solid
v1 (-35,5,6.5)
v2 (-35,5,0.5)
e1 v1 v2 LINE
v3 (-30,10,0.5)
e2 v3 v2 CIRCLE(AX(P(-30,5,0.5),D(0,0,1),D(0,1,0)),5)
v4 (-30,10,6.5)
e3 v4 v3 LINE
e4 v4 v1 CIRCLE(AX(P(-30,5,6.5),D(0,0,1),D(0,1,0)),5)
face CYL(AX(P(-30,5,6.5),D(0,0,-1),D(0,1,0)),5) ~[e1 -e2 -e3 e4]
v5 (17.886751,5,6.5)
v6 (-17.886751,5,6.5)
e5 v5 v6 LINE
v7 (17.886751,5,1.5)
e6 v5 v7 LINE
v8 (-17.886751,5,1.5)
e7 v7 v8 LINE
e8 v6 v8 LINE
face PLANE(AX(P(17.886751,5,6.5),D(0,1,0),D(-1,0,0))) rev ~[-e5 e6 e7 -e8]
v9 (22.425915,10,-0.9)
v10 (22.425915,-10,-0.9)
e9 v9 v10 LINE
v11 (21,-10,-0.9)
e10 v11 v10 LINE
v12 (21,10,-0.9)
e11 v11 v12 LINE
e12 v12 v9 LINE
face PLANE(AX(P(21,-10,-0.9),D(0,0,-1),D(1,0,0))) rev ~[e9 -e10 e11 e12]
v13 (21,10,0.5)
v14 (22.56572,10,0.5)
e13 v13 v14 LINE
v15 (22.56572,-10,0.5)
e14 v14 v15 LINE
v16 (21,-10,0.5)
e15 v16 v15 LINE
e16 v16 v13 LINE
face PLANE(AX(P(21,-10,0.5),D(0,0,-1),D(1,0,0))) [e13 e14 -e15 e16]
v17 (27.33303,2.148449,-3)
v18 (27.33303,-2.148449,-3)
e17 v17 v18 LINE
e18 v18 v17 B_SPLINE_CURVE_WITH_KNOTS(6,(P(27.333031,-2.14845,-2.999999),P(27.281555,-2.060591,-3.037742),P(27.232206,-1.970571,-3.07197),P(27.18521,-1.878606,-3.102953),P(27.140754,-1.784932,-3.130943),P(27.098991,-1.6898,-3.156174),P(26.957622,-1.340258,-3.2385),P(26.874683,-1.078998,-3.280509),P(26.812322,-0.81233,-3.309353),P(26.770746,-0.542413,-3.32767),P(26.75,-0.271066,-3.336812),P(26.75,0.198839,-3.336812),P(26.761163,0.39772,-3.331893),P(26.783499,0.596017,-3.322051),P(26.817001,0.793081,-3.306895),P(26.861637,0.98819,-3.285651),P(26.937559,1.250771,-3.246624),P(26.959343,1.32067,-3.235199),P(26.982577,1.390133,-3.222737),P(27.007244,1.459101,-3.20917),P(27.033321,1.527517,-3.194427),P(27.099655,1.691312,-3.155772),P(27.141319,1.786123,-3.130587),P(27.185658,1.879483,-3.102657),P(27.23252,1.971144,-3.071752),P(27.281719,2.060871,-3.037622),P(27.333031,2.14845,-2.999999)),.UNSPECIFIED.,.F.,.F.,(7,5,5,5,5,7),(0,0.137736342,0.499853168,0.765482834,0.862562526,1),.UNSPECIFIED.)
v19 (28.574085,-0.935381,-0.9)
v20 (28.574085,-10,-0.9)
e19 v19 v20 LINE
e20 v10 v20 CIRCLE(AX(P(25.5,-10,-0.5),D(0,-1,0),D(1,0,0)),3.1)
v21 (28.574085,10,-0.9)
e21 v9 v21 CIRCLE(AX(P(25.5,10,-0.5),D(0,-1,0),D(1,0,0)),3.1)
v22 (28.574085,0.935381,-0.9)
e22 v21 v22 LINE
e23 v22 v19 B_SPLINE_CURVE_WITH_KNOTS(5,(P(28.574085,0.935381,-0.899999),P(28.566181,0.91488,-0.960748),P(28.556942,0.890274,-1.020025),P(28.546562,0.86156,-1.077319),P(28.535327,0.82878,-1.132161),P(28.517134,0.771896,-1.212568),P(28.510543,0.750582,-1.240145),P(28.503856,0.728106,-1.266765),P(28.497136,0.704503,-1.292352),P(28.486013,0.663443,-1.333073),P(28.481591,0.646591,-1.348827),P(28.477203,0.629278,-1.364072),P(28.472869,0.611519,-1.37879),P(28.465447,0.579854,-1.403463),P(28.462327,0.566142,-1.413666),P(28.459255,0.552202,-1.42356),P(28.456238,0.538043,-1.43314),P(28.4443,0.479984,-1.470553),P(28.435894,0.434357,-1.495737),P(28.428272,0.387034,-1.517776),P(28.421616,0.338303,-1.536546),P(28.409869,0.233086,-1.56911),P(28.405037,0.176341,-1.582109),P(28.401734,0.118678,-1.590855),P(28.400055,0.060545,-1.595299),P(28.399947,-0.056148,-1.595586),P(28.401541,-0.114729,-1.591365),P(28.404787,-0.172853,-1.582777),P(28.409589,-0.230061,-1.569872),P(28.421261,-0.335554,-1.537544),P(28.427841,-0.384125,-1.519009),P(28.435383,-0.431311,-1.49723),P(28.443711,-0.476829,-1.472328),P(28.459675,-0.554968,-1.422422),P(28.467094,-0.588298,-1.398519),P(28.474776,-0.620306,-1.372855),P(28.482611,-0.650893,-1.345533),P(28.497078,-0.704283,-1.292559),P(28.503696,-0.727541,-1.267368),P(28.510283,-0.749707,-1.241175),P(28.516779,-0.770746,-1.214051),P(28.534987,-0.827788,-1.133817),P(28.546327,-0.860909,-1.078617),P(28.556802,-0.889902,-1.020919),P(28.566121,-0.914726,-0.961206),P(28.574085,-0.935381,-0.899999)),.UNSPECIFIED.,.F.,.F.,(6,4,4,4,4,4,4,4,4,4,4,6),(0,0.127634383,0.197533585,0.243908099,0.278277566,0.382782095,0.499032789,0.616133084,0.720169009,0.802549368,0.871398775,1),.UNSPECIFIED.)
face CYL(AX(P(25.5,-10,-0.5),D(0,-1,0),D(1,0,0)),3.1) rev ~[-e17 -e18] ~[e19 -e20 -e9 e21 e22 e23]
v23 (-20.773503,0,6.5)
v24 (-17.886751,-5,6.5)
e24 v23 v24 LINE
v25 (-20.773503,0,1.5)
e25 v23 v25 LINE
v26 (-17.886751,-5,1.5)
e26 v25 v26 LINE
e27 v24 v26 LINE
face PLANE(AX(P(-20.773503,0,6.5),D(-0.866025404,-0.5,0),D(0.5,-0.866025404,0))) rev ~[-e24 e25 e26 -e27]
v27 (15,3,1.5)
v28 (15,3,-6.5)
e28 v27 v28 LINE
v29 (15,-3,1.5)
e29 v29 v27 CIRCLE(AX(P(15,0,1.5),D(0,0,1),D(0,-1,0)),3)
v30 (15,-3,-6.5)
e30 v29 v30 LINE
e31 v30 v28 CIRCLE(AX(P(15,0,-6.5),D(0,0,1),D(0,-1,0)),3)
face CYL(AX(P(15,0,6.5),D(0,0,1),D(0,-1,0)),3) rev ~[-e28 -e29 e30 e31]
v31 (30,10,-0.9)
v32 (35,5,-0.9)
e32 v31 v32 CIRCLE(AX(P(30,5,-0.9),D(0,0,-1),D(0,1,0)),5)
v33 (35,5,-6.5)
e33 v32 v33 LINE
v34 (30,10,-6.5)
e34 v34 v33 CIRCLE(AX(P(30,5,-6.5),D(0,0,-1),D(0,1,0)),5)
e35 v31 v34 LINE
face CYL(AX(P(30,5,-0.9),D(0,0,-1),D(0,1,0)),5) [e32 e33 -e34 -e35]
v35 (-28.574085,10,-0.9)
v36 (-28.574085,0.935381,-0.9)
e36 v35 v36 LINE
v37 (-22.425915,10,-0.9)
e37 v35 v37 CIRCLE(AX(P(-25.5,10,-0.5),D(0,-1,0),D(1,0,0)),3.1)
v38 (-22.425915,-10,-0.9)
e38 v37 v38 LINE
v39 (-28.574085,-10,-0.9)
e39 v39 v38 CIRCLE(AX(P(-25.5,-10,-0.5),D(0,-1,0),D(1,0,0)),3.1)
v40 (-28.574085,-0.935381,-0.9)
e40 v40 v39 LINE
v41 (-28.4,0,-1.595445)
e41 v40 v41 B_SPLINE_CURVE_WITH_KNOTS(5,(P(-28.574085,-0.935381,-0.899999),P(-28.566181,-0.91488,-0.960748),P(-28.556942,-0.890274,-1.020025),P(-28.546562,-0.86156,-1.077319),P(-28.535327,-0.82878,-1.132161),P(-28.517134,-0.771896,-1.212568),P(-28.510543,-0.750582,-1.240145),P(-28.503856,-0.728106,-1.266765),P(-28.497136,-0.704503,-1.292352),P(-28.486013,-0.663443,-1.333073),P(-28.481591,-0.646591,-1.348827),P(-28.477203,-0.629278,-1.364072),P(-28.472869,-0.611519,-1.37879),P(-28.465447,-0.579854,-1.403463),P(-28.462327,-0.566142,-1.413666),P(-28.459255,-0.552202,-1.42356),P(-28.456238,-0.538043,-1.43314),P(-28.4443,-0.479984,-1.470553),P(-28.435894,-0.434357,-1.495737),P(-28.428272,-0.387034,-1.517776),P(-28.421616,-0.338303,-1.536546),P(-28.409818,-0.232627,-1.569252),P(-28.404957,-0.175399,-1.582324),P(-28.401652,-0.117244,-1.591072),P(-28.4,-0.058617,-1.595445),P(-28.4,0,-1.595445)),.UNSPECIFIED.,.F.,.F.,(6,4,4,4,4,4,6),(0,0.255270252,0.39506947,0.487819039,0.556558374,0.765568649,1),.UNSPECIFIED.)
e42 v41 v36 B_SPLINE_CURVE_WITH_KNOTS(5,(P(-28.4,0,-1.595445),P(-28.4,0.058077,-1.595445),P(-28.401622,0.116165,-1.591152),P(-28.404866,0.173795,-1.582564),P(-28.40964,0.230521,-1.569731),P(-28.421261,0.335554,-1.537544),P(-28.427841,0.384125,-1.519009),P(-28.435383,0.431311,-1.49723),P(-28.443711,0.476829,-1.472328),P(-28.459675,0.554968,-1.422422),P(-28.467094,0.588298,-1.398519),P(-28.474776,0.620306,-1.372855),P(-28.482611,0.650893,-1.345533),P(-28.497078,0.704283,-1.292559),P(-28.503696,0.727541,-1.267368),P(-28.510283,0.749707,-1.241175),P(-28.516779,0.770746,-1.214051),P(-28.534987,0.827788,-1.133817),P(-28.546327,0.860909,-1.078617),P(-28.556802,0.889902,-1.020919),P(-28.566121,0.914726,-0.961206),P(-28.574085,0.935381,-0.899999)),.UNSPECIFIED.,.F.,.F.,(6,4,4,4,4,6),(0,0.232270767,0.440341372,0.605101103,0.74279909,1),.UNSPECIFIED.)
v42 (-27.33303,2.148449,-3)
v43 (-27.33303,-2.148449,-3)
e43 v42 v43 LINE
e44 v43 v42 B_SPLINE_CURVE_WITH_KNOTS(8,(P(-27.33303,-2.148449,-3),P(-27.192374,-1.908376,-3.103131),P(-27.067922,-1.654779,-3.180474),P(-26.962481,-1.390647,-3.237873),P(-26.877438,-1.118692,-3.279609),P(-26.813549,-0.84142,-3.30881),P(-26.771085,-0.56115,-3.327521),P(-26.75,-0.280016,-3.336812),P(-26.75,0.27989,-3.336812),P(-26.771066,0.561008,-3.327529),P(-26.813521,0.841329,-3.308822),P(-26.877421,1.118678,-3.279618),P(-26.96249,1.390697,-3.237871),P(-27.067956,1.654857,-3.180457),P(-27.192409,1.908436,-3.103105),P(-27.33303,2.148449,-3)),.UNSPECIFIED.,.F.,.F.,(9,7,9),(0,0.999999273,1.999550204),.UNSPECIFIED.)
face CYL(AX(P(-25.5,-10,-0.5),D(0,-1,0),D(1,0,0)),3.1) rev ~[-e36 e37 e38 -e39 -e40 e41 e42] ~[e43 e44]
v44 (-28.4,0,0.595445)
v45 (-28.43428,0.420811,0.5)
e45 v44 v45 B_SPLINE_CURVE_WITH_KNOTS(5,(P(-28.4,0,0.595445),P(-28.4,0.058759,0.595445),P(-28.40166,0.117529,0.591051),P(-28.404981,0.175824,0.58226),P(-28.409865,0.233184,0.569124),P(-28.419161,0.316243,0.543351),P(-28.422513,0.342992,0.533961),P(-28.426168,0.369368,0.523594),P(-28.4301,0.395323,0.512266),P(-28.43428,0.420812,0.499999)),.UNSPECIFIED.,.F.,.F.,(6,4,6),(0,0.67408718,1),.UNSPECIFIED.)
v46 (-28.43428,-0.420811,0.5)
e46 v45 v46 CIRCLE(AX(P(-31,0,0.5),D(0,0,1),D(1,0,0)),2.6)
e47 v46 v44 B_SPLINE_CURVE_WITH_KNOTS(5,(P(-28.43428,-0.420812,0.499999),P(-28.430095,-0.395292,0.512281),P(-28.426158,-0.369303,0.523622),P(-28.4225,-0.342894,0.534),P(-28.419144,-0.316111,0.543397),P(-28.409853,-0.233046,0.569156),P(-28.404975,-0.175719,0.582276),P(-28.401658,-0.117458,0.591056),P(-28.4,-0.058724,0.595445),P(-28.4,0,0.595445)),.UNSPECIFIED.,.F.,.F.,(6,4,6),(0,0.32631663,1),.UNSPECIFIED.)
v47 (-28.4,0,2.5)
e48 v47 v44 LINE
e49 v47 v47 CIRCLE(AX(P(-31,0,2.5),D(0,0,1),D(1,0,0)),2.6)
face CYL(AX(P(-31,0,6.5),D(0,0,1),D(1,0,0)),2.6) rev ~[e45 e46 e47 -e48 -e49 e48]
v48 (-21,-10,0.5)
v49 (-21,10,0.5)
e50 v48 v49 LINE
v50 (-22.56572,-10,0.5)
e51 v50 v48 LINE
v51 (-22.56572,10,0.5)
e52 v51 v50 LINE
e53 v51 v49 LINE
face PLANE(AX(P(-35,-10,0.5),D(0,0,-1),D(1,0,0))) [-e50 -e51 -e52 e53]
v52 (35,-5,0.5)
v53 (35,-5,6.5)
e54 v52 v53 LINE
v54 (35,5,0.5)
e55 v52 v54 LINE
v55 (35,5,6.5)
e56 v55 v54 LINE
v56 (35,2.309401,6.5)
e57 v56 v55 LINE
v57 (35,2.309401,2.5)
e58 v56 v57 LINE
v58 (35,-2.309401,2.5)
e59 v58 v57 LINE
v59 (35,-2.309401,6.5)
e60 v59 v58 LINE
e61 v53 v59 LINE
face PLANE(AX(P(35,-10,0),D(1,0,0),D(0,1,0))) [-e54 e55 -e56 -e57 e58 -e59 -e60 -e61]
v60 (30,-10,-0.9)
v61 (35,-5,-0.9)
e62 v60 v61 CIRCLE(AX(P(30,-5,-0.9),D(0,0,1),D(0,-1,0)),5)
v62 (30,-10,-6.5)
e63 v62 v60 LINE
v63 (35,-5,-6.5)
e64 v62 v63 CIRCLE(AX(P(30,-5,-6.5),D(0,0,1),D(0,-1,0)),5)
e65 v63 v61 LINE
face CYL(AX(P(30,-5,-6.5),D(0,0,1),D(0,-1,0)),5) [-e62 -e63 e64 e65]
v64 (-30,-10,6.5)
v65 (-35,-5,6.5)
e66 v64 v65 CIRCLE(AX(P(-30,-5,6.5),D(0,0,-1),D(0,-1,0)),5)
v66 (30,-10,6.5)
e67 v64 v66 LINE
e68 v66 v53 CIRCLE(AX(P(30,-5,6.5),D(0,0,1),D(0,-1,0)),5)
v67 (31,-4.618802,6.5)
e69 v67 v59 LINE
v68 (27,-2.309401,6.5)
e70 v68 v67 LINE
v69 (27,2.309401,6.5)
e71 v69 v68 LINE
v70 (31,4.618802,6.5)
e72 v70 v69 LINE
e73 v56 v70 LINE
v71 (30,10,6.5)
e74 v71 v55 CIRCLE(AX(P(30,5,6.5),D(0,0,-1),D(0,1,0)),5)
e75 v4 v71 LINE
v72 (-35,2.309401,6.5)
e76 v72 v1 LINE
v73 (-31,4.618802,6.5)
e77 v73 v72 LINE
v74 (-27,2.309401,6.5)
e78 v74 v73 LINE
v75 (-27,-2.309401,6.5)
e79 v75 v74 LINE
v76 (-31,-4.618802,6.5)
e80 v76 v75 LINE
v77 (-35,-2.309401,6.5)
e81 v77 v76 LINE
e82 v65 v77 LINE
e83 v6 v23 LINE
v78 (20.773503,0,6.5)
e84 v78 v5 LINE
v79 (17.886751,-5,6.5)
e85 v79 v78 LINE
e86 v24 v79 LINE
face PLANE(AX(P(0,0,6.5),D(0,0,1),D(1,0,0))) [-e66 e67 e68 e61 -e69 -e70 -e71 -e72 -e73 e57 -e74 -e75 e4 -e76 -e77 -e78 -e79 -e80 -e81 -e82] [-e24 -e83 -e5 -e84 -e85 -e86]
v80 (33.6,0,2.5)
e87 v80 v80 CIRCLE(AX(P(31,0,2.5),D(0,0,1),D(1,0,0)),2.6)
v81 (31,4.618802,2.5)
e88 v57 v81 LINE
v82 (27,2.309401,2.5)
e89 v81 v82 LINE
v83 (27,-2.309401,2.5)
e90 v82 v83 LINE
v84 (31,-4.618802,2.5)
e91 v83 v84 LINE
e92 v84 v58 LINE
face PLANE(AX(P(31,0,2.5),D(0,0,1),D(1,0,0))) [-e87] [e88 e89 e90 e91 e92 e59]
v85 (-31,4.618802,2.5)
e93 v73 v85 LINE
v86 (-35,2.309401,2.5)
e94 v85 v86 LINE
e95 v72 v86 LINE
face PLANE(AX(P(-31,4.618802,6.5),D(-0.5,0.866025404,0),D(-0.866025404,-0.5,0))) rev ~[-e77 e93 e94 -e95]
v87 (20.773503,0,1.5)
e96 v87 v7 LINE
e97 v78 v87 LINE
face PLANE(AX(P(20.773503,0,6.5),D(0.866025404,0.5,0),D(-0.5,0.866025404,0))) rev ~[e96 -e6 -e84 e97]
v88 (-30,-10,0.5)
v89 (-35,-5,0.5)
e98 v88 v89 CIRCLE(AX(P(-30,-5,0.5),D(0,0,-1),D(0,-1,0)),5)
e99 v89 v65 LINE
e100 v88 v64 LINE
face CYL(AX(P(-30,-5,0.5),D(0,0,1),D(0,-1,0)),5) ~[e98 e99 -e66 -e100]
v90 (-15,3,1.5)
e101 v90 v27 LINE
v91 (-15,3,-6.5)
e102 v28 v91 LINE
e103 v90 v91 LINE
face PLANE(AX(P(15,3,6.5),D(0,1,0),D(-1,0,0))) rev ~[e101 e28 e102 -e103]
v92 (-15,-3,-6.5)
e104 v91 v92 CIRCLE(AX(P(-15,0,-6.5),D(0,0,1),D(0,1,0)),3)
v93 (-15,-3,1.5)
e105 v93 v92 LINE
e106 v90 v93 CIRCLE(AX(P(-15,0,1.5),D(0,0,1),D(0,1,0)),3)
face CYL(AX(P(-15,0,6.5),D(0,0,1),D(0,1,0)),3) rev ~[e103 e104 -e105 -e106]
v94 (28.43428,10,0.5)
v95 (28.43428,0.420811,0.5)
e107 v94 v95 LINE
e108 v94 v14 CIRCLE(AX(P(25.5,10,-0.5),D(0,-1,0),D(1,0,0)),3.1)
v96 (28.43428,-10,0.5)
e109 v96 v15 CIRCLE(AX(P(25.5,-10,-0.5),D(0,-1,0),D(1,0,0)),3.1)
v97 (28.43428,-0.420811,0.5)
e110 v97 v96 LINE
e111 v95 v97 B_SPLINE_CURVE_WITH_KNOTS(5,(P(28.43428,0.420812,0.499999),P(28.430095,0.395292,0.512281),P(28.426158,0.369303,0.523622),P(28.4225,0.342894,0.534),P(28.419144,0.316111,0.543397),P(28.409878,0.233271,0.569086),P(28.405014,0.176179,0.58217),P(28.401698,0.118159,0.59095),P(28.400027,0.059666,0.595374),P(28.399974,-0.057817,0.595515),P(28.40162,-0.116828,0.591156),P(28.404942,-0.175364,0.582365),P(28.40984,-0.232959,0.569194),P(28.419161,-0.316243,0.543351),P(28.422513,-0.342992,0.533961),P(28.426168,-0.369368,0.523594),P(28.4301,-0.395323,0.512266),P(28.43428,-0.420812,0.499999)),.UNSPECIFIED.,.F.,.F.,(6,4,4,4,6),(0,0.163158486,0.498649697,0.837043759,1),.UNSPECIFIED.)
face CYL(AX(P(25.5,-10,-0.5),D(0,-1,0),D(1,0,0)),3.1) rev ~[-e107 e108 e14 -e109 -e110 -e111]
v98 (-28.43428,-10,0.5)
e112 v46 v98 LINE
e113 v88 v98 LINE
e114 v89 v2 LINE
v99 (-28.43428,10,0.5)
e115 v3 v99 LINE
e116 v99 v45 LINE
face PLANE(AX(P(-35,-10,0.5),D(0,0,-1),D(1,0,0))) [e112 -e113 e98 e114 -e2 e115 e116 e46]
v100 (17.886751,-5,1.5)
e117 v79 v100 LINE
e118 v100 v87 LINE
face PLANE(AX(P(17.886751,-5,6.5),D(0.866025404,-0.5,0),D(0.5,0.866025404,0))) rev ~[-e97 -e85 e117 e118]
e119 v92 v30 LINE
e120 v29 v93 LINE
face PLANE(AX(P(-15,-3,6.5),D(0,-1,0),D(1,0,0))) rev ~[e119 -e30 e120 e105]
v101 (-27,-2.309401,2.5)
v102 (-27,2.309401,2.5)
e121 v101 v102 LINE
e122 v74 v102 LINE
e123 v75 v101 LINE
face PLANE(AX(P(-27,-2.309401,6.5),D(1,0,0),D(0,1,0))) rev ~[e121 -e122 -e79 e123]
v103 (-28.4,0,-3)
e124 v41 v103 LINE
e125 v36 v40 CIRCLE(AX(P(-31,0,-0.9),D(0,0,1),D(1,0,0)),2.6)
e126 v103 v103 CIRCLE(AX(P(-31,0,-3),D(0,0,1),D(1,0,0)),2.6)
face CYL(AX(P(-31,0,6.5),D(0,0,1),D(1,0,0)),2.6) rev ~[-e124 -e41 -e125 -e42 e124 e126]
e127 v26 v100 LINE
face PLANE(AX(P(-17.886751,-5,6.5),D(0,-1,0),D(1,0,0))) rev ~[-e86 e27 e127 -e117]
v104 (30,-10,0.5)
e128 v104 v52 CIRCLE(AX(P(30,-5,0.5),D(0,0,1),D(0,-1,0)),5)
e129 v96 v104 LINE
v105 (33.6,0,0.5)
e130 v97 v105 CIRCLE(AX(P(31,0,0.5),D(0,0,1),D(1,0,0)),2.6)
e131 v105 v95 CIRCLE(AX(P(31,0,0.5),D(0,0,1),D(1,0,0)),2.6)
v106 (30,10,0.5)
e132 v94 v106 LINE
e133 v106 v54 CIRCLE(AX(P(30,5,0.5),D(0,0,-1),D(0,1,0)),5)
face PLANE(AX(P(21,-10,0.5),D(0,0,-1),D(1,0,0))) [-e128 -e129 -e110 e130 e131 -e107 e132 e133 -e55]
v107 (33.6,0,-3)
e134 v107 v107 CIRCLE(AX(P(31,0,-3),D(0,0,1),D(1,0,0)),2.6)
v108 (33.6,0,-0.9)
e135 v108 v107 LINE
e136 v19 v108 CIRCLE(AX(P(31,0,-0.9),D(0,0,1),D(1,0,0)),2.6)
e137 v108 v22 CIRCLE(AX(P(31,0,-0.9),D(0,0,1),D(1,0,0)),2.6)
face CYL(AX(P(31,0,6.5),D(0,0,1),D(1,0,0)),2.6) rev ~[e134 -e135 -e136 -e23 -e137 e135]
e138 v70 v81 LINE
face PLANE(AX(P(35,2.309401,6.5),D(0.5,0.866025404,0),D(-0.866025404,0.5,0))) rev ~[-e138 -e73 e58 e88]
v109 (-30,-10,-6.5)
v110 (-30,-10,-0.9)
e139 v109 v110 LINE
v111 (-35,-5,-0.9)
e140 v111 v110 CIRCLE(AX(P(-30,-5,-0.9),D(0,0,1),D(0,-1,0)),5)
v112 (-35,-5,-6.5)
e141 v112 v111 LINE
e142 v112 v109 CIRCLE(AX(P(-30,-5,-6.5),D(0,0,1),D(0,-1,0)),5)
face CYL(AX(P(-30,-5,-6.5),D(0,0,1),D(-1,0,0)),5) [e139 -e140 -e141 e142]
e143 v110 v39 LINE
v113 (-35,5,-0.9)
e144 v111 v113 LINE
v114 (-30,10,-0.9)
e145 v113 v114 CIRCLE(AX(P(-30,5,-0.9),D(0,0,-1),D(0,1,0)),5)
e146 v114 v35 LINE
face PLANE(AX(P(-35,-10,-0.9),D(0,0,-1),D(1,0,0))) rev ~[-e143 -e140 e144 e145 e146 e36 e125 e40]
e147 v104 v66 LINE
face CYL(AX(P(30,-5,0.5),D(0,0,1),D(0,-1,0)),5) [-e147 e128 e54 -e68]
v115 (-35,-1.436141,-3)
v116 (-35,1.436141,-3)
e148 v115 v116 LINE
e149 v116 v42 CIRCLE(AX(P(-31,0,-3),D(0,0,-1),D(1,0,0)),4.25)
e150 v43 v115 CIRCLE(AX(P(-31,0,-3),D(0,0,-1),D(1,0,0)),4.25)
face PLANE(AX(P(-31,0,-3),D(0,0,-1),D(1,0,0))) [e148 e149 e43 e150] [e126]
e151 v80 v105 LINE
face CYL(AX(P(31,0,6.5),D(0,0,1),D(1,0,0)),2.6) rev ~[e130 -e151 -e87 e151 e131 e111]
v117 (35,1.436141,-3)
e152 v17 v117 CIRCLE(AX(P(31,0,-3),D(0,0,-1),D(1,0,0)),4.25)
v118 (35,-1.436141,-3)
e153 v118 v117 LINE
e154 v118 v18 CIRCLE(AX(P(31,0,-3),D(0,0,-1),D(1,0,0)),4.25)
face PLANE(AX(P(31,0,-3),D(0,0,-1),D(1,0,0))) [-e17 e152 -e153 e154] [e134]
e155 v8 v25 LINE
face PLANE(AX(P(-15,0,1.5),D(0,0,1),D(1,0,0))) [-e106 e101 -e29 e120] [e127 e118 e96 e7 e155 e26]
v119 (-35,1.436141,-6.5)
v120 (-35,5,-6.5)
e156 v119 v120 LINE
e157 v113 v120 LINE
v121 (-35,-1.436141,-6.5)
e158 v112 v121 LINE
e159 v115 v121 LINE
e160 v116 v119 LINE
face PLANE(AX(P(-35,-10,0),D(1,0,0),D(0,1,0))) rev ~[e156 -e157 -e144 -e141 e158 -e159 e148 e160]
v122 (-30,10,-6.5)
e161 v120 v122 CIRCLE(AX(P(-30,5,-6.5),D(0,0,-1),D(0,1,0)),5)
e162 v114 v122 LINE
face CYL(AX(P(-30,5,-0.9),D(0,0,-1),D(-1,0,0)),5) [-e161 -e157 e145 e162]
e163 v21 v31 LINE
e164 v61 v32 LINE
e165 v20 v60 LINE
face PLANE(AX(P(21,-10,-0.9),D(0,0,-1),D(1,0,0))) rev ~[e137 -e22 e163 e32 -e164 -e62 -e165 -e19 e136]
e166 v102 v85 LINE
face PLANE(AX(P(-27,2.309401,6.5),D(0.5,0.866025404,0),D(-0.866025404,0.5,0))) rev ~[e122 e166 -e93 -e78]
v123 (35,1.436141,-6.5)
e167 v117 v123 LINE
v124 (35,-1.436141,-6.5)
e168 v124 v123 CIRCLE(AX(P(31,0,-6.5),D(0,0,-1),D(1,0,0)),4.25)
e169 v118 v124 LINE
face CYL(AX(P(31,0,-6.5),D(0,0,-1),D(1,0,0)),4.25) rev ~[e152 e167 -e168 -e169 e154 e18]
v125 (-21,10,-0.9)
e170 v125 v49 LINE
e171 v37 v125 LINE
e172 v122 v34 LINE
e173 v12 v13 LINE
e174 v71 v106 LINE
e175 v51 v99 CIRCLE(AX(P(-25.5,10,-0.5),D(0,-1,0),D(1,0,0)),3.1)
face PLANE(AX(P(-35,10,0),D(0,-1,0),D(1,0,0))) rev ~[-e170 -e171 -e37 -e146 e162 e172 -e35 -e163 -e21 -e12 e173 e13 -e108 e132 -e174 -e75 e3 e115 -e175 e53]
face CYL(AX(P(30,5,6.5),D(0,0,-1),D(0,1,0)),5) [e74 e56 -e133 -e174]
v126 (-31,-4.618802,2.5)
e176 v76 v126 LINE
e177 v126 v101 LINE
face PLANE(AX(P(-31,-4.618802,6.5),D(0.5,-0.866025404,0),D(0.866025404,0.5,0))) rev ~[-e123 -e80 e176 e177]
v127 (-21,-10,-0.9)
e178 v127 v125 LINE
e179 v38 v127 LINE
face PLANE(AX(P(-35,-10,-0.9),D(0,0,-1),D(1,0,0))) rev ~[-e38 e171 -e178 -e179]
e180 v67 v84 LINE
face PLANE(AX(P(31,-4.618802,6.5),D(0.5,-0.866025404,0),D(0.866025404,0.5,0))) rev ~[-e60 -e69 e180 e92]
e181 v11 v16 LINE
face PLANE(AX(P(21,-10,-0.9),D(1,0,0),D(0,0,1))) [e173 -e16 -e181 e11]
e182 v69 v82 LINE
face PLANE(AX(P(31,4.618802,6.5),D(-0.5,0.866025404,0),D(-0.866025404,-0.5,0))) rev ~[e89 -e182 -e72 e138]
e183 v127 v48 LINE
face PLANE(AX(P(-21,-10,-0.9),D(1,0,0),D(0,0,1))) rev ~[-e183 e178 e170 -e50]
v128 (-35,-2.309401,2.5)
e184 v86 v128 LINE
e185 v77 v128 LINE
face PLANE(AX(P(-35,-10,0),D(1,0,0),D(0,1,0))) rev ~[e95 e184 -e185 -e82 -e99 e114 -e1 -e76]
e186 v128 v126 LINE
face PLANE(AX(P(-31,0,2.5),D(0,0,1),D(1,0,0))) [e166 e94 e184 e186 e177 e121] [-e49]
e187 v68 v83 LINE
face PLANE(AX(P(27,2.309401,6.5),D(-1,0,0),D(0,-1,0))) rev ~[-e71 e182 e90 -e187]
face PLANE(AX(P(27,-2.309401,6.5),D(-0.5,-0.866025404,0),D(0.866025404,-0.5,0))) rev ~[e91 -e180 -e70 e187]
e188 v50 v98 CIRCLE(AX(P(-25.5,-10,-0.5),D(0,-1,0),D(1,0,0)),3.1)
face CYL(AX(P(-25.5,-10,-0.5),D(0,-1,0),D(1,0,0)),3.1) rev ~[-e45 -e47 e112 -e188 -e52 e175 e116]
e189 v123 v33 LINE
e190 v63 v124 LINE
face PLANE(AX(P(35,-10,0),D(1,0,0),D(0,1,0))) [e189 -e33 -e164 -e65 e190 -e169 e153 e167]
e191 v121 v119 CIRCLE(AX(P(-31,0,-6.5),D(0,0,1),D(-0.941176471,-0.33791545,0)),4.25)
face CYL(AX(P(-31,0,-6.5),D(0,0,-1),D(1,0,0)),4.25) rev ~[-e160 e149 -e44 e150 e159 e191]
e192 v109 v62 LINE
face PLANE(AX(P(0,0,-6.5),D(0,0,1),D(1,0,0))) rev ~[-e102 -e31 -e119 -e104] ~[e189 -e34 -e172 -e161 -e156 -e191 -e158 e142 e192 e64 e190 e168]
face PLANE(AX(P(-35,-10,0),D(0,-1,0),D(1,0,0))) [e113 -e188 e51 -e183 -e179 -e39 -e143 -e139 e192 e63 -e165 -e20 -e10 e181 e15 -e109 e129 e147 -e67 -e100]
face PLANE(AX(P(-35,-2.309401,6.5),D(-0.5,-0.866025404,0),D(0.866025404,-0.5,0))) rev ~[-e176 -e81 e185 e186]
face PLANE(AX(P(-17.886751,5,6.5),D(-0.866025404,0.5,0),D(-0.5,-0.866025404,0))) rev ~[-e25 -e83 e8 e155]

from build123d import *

# Parameters (mm, degrees)
F0_W      = 70
F0_H      = 20
F1_DEPTH  = 6.5
F4_DEPTH  = 4
F5_R      = 2.6
F6_DEPTH  = 13.001
F7_DEPTH  = 13.001
F8_W      = 14
F8_H      = 1.4
F9_DEPTH  = 20.001
F11_R     = 5
F10_R     = 3.1
F12_DEPTH = 20.001
F13_R     = 4.25
F14_DEPTH = 3.5
F16_DEPTH = 5


with BuildPart() as f1:
    # F0 (on Top) → F1 (new body, symmetric)
    with BuildSketch(Plane.XY):
        Rectangle(F0_W, F0_H)
    extrude(amount=F1_DEPTH, both=True)

    # F3 (on face) → F4 (cut)
    with BuildSketch(Plane.XY.offset(6.5)):
        Polygon((-31, -4.6188021535), (-27, -2.3094010768), (-27, 2.3094010768), (-31, 4.6188021535), (-35, 2.3094010768), (-35, -2.3094010768), align=None)
        Polygon((35, -2.3094010768), (35, 2.3094010768), (31, 4.6188021535), (27, 2.3094010768), (27, -2.3094010768), (31, -4.6188021535), align=None)
    extrude(amount=-F4_DEPTH, mode=Mode.SUBTRACT)

    # F5 (on face) → F6 (cut, through all)
    with BuildSketch(Plane.XY.offset(6.5)):
        with Locations((-31, 0)):
            Circle(F5_R)
        with Locations((31, 0)):
            Circle(F5_R)
    extrude(amount=-F6_DEPTH, mode=Mode.SUBTRACT)

    # F2 (on face) → F7 (cut, through all)
    with BuildSketch(Plane.XY.offset(6.5)):
        with BuildLine():
            Line((-15, -3), (15, -3))
            ThreePointArc((15, -3), (18, 0), (15, 3))
            Line((15, 3), (-15, 3))
            ThreePointArc((-15, 3), (-18, 0), (-15, -3))
        make_face()
    extrude(amount=-F7_DEPTH, mode=Mode.SUBTRACT)

    # F8 (on face) → F9 (cut, through all)
    with BuildSketch(Plane.XZ.offset(10)):
        with Locations((-28, -0.2)):
            Rectangle(F8_W, F8_H)
        with Locations((28, -0.2)):
            Rectangle(F8_W, F8_H)
    extrude(amount=-F9_DEPTH, mode=Mode.SUBTRACT)

    # F11
    f11_edges = [f1.edges().sort_by_distance(p)[0] for p in [
        (35, 10, 3.5),
        (35, 10, -3.7),
        (35, -10, 3.5),
        (35, -10, -3.7),
        (-35, -10, -3.7),
        (-35, -10, 3.5),
        (-35, 10, 3.5),
        (-35, 10, -3.7),
    ]]
    fillet(f11_edges, radius=F11_R)

    # F10 (on face) → F12 (cut, through all)
    with BuildSketch(Plane.XZ.offset(10)):
        with Locations((-25.5, -0.5)):
            Circle(F10_R)
        with Locations((25.5, -0.5)):
            Circle(F10_R)
    extrude(amount=-F12_DEPTH, mode=Mode.SUBTRACT)

    # F13 (on face) → F14 (cut)
    with BuildSketch(Plane(origin=(0, 0, -6.5), x_dir=(1, 0, 0), z_dir=(0, 0, -1))):
        with Locations((31, 0)):
            Circle(F13_R)
        with Locations((-31, 0)):
            Circle(F13_R)
    extrude(amount=-F14_DEPTH, mode=Mode.SUBTRACT)

    # F15 (on face) → F16 (cut)
    with BuildSketch(Plane.XY.offset(6.5)):
        Polygon((-17.8867513459, -5), (-12.1132486541, -5), (-9.2264973081, 0), (-12.1132486541, 5), (-17.8867513459, 5), (-20.7735026919, 0), align=None)
        Polygon((-9.2264973081, 0), (-12.1132486541, -5), (12.1132486541, -5), (9.2264973081, 0), (12.1132486541, 5), (-12.1132486541, 5), align=None)
        Polygon((9.2264973081, 0), (12.1132486541, -5), (17.8867513459, -5), (20.7735026919, 0), (17.8867513459, 5), (12.1132486541, 5), align=None)
    extrude(amount=-F16_DEPTH, mode=Mode.SUBTRACT)


solid = f1.part
